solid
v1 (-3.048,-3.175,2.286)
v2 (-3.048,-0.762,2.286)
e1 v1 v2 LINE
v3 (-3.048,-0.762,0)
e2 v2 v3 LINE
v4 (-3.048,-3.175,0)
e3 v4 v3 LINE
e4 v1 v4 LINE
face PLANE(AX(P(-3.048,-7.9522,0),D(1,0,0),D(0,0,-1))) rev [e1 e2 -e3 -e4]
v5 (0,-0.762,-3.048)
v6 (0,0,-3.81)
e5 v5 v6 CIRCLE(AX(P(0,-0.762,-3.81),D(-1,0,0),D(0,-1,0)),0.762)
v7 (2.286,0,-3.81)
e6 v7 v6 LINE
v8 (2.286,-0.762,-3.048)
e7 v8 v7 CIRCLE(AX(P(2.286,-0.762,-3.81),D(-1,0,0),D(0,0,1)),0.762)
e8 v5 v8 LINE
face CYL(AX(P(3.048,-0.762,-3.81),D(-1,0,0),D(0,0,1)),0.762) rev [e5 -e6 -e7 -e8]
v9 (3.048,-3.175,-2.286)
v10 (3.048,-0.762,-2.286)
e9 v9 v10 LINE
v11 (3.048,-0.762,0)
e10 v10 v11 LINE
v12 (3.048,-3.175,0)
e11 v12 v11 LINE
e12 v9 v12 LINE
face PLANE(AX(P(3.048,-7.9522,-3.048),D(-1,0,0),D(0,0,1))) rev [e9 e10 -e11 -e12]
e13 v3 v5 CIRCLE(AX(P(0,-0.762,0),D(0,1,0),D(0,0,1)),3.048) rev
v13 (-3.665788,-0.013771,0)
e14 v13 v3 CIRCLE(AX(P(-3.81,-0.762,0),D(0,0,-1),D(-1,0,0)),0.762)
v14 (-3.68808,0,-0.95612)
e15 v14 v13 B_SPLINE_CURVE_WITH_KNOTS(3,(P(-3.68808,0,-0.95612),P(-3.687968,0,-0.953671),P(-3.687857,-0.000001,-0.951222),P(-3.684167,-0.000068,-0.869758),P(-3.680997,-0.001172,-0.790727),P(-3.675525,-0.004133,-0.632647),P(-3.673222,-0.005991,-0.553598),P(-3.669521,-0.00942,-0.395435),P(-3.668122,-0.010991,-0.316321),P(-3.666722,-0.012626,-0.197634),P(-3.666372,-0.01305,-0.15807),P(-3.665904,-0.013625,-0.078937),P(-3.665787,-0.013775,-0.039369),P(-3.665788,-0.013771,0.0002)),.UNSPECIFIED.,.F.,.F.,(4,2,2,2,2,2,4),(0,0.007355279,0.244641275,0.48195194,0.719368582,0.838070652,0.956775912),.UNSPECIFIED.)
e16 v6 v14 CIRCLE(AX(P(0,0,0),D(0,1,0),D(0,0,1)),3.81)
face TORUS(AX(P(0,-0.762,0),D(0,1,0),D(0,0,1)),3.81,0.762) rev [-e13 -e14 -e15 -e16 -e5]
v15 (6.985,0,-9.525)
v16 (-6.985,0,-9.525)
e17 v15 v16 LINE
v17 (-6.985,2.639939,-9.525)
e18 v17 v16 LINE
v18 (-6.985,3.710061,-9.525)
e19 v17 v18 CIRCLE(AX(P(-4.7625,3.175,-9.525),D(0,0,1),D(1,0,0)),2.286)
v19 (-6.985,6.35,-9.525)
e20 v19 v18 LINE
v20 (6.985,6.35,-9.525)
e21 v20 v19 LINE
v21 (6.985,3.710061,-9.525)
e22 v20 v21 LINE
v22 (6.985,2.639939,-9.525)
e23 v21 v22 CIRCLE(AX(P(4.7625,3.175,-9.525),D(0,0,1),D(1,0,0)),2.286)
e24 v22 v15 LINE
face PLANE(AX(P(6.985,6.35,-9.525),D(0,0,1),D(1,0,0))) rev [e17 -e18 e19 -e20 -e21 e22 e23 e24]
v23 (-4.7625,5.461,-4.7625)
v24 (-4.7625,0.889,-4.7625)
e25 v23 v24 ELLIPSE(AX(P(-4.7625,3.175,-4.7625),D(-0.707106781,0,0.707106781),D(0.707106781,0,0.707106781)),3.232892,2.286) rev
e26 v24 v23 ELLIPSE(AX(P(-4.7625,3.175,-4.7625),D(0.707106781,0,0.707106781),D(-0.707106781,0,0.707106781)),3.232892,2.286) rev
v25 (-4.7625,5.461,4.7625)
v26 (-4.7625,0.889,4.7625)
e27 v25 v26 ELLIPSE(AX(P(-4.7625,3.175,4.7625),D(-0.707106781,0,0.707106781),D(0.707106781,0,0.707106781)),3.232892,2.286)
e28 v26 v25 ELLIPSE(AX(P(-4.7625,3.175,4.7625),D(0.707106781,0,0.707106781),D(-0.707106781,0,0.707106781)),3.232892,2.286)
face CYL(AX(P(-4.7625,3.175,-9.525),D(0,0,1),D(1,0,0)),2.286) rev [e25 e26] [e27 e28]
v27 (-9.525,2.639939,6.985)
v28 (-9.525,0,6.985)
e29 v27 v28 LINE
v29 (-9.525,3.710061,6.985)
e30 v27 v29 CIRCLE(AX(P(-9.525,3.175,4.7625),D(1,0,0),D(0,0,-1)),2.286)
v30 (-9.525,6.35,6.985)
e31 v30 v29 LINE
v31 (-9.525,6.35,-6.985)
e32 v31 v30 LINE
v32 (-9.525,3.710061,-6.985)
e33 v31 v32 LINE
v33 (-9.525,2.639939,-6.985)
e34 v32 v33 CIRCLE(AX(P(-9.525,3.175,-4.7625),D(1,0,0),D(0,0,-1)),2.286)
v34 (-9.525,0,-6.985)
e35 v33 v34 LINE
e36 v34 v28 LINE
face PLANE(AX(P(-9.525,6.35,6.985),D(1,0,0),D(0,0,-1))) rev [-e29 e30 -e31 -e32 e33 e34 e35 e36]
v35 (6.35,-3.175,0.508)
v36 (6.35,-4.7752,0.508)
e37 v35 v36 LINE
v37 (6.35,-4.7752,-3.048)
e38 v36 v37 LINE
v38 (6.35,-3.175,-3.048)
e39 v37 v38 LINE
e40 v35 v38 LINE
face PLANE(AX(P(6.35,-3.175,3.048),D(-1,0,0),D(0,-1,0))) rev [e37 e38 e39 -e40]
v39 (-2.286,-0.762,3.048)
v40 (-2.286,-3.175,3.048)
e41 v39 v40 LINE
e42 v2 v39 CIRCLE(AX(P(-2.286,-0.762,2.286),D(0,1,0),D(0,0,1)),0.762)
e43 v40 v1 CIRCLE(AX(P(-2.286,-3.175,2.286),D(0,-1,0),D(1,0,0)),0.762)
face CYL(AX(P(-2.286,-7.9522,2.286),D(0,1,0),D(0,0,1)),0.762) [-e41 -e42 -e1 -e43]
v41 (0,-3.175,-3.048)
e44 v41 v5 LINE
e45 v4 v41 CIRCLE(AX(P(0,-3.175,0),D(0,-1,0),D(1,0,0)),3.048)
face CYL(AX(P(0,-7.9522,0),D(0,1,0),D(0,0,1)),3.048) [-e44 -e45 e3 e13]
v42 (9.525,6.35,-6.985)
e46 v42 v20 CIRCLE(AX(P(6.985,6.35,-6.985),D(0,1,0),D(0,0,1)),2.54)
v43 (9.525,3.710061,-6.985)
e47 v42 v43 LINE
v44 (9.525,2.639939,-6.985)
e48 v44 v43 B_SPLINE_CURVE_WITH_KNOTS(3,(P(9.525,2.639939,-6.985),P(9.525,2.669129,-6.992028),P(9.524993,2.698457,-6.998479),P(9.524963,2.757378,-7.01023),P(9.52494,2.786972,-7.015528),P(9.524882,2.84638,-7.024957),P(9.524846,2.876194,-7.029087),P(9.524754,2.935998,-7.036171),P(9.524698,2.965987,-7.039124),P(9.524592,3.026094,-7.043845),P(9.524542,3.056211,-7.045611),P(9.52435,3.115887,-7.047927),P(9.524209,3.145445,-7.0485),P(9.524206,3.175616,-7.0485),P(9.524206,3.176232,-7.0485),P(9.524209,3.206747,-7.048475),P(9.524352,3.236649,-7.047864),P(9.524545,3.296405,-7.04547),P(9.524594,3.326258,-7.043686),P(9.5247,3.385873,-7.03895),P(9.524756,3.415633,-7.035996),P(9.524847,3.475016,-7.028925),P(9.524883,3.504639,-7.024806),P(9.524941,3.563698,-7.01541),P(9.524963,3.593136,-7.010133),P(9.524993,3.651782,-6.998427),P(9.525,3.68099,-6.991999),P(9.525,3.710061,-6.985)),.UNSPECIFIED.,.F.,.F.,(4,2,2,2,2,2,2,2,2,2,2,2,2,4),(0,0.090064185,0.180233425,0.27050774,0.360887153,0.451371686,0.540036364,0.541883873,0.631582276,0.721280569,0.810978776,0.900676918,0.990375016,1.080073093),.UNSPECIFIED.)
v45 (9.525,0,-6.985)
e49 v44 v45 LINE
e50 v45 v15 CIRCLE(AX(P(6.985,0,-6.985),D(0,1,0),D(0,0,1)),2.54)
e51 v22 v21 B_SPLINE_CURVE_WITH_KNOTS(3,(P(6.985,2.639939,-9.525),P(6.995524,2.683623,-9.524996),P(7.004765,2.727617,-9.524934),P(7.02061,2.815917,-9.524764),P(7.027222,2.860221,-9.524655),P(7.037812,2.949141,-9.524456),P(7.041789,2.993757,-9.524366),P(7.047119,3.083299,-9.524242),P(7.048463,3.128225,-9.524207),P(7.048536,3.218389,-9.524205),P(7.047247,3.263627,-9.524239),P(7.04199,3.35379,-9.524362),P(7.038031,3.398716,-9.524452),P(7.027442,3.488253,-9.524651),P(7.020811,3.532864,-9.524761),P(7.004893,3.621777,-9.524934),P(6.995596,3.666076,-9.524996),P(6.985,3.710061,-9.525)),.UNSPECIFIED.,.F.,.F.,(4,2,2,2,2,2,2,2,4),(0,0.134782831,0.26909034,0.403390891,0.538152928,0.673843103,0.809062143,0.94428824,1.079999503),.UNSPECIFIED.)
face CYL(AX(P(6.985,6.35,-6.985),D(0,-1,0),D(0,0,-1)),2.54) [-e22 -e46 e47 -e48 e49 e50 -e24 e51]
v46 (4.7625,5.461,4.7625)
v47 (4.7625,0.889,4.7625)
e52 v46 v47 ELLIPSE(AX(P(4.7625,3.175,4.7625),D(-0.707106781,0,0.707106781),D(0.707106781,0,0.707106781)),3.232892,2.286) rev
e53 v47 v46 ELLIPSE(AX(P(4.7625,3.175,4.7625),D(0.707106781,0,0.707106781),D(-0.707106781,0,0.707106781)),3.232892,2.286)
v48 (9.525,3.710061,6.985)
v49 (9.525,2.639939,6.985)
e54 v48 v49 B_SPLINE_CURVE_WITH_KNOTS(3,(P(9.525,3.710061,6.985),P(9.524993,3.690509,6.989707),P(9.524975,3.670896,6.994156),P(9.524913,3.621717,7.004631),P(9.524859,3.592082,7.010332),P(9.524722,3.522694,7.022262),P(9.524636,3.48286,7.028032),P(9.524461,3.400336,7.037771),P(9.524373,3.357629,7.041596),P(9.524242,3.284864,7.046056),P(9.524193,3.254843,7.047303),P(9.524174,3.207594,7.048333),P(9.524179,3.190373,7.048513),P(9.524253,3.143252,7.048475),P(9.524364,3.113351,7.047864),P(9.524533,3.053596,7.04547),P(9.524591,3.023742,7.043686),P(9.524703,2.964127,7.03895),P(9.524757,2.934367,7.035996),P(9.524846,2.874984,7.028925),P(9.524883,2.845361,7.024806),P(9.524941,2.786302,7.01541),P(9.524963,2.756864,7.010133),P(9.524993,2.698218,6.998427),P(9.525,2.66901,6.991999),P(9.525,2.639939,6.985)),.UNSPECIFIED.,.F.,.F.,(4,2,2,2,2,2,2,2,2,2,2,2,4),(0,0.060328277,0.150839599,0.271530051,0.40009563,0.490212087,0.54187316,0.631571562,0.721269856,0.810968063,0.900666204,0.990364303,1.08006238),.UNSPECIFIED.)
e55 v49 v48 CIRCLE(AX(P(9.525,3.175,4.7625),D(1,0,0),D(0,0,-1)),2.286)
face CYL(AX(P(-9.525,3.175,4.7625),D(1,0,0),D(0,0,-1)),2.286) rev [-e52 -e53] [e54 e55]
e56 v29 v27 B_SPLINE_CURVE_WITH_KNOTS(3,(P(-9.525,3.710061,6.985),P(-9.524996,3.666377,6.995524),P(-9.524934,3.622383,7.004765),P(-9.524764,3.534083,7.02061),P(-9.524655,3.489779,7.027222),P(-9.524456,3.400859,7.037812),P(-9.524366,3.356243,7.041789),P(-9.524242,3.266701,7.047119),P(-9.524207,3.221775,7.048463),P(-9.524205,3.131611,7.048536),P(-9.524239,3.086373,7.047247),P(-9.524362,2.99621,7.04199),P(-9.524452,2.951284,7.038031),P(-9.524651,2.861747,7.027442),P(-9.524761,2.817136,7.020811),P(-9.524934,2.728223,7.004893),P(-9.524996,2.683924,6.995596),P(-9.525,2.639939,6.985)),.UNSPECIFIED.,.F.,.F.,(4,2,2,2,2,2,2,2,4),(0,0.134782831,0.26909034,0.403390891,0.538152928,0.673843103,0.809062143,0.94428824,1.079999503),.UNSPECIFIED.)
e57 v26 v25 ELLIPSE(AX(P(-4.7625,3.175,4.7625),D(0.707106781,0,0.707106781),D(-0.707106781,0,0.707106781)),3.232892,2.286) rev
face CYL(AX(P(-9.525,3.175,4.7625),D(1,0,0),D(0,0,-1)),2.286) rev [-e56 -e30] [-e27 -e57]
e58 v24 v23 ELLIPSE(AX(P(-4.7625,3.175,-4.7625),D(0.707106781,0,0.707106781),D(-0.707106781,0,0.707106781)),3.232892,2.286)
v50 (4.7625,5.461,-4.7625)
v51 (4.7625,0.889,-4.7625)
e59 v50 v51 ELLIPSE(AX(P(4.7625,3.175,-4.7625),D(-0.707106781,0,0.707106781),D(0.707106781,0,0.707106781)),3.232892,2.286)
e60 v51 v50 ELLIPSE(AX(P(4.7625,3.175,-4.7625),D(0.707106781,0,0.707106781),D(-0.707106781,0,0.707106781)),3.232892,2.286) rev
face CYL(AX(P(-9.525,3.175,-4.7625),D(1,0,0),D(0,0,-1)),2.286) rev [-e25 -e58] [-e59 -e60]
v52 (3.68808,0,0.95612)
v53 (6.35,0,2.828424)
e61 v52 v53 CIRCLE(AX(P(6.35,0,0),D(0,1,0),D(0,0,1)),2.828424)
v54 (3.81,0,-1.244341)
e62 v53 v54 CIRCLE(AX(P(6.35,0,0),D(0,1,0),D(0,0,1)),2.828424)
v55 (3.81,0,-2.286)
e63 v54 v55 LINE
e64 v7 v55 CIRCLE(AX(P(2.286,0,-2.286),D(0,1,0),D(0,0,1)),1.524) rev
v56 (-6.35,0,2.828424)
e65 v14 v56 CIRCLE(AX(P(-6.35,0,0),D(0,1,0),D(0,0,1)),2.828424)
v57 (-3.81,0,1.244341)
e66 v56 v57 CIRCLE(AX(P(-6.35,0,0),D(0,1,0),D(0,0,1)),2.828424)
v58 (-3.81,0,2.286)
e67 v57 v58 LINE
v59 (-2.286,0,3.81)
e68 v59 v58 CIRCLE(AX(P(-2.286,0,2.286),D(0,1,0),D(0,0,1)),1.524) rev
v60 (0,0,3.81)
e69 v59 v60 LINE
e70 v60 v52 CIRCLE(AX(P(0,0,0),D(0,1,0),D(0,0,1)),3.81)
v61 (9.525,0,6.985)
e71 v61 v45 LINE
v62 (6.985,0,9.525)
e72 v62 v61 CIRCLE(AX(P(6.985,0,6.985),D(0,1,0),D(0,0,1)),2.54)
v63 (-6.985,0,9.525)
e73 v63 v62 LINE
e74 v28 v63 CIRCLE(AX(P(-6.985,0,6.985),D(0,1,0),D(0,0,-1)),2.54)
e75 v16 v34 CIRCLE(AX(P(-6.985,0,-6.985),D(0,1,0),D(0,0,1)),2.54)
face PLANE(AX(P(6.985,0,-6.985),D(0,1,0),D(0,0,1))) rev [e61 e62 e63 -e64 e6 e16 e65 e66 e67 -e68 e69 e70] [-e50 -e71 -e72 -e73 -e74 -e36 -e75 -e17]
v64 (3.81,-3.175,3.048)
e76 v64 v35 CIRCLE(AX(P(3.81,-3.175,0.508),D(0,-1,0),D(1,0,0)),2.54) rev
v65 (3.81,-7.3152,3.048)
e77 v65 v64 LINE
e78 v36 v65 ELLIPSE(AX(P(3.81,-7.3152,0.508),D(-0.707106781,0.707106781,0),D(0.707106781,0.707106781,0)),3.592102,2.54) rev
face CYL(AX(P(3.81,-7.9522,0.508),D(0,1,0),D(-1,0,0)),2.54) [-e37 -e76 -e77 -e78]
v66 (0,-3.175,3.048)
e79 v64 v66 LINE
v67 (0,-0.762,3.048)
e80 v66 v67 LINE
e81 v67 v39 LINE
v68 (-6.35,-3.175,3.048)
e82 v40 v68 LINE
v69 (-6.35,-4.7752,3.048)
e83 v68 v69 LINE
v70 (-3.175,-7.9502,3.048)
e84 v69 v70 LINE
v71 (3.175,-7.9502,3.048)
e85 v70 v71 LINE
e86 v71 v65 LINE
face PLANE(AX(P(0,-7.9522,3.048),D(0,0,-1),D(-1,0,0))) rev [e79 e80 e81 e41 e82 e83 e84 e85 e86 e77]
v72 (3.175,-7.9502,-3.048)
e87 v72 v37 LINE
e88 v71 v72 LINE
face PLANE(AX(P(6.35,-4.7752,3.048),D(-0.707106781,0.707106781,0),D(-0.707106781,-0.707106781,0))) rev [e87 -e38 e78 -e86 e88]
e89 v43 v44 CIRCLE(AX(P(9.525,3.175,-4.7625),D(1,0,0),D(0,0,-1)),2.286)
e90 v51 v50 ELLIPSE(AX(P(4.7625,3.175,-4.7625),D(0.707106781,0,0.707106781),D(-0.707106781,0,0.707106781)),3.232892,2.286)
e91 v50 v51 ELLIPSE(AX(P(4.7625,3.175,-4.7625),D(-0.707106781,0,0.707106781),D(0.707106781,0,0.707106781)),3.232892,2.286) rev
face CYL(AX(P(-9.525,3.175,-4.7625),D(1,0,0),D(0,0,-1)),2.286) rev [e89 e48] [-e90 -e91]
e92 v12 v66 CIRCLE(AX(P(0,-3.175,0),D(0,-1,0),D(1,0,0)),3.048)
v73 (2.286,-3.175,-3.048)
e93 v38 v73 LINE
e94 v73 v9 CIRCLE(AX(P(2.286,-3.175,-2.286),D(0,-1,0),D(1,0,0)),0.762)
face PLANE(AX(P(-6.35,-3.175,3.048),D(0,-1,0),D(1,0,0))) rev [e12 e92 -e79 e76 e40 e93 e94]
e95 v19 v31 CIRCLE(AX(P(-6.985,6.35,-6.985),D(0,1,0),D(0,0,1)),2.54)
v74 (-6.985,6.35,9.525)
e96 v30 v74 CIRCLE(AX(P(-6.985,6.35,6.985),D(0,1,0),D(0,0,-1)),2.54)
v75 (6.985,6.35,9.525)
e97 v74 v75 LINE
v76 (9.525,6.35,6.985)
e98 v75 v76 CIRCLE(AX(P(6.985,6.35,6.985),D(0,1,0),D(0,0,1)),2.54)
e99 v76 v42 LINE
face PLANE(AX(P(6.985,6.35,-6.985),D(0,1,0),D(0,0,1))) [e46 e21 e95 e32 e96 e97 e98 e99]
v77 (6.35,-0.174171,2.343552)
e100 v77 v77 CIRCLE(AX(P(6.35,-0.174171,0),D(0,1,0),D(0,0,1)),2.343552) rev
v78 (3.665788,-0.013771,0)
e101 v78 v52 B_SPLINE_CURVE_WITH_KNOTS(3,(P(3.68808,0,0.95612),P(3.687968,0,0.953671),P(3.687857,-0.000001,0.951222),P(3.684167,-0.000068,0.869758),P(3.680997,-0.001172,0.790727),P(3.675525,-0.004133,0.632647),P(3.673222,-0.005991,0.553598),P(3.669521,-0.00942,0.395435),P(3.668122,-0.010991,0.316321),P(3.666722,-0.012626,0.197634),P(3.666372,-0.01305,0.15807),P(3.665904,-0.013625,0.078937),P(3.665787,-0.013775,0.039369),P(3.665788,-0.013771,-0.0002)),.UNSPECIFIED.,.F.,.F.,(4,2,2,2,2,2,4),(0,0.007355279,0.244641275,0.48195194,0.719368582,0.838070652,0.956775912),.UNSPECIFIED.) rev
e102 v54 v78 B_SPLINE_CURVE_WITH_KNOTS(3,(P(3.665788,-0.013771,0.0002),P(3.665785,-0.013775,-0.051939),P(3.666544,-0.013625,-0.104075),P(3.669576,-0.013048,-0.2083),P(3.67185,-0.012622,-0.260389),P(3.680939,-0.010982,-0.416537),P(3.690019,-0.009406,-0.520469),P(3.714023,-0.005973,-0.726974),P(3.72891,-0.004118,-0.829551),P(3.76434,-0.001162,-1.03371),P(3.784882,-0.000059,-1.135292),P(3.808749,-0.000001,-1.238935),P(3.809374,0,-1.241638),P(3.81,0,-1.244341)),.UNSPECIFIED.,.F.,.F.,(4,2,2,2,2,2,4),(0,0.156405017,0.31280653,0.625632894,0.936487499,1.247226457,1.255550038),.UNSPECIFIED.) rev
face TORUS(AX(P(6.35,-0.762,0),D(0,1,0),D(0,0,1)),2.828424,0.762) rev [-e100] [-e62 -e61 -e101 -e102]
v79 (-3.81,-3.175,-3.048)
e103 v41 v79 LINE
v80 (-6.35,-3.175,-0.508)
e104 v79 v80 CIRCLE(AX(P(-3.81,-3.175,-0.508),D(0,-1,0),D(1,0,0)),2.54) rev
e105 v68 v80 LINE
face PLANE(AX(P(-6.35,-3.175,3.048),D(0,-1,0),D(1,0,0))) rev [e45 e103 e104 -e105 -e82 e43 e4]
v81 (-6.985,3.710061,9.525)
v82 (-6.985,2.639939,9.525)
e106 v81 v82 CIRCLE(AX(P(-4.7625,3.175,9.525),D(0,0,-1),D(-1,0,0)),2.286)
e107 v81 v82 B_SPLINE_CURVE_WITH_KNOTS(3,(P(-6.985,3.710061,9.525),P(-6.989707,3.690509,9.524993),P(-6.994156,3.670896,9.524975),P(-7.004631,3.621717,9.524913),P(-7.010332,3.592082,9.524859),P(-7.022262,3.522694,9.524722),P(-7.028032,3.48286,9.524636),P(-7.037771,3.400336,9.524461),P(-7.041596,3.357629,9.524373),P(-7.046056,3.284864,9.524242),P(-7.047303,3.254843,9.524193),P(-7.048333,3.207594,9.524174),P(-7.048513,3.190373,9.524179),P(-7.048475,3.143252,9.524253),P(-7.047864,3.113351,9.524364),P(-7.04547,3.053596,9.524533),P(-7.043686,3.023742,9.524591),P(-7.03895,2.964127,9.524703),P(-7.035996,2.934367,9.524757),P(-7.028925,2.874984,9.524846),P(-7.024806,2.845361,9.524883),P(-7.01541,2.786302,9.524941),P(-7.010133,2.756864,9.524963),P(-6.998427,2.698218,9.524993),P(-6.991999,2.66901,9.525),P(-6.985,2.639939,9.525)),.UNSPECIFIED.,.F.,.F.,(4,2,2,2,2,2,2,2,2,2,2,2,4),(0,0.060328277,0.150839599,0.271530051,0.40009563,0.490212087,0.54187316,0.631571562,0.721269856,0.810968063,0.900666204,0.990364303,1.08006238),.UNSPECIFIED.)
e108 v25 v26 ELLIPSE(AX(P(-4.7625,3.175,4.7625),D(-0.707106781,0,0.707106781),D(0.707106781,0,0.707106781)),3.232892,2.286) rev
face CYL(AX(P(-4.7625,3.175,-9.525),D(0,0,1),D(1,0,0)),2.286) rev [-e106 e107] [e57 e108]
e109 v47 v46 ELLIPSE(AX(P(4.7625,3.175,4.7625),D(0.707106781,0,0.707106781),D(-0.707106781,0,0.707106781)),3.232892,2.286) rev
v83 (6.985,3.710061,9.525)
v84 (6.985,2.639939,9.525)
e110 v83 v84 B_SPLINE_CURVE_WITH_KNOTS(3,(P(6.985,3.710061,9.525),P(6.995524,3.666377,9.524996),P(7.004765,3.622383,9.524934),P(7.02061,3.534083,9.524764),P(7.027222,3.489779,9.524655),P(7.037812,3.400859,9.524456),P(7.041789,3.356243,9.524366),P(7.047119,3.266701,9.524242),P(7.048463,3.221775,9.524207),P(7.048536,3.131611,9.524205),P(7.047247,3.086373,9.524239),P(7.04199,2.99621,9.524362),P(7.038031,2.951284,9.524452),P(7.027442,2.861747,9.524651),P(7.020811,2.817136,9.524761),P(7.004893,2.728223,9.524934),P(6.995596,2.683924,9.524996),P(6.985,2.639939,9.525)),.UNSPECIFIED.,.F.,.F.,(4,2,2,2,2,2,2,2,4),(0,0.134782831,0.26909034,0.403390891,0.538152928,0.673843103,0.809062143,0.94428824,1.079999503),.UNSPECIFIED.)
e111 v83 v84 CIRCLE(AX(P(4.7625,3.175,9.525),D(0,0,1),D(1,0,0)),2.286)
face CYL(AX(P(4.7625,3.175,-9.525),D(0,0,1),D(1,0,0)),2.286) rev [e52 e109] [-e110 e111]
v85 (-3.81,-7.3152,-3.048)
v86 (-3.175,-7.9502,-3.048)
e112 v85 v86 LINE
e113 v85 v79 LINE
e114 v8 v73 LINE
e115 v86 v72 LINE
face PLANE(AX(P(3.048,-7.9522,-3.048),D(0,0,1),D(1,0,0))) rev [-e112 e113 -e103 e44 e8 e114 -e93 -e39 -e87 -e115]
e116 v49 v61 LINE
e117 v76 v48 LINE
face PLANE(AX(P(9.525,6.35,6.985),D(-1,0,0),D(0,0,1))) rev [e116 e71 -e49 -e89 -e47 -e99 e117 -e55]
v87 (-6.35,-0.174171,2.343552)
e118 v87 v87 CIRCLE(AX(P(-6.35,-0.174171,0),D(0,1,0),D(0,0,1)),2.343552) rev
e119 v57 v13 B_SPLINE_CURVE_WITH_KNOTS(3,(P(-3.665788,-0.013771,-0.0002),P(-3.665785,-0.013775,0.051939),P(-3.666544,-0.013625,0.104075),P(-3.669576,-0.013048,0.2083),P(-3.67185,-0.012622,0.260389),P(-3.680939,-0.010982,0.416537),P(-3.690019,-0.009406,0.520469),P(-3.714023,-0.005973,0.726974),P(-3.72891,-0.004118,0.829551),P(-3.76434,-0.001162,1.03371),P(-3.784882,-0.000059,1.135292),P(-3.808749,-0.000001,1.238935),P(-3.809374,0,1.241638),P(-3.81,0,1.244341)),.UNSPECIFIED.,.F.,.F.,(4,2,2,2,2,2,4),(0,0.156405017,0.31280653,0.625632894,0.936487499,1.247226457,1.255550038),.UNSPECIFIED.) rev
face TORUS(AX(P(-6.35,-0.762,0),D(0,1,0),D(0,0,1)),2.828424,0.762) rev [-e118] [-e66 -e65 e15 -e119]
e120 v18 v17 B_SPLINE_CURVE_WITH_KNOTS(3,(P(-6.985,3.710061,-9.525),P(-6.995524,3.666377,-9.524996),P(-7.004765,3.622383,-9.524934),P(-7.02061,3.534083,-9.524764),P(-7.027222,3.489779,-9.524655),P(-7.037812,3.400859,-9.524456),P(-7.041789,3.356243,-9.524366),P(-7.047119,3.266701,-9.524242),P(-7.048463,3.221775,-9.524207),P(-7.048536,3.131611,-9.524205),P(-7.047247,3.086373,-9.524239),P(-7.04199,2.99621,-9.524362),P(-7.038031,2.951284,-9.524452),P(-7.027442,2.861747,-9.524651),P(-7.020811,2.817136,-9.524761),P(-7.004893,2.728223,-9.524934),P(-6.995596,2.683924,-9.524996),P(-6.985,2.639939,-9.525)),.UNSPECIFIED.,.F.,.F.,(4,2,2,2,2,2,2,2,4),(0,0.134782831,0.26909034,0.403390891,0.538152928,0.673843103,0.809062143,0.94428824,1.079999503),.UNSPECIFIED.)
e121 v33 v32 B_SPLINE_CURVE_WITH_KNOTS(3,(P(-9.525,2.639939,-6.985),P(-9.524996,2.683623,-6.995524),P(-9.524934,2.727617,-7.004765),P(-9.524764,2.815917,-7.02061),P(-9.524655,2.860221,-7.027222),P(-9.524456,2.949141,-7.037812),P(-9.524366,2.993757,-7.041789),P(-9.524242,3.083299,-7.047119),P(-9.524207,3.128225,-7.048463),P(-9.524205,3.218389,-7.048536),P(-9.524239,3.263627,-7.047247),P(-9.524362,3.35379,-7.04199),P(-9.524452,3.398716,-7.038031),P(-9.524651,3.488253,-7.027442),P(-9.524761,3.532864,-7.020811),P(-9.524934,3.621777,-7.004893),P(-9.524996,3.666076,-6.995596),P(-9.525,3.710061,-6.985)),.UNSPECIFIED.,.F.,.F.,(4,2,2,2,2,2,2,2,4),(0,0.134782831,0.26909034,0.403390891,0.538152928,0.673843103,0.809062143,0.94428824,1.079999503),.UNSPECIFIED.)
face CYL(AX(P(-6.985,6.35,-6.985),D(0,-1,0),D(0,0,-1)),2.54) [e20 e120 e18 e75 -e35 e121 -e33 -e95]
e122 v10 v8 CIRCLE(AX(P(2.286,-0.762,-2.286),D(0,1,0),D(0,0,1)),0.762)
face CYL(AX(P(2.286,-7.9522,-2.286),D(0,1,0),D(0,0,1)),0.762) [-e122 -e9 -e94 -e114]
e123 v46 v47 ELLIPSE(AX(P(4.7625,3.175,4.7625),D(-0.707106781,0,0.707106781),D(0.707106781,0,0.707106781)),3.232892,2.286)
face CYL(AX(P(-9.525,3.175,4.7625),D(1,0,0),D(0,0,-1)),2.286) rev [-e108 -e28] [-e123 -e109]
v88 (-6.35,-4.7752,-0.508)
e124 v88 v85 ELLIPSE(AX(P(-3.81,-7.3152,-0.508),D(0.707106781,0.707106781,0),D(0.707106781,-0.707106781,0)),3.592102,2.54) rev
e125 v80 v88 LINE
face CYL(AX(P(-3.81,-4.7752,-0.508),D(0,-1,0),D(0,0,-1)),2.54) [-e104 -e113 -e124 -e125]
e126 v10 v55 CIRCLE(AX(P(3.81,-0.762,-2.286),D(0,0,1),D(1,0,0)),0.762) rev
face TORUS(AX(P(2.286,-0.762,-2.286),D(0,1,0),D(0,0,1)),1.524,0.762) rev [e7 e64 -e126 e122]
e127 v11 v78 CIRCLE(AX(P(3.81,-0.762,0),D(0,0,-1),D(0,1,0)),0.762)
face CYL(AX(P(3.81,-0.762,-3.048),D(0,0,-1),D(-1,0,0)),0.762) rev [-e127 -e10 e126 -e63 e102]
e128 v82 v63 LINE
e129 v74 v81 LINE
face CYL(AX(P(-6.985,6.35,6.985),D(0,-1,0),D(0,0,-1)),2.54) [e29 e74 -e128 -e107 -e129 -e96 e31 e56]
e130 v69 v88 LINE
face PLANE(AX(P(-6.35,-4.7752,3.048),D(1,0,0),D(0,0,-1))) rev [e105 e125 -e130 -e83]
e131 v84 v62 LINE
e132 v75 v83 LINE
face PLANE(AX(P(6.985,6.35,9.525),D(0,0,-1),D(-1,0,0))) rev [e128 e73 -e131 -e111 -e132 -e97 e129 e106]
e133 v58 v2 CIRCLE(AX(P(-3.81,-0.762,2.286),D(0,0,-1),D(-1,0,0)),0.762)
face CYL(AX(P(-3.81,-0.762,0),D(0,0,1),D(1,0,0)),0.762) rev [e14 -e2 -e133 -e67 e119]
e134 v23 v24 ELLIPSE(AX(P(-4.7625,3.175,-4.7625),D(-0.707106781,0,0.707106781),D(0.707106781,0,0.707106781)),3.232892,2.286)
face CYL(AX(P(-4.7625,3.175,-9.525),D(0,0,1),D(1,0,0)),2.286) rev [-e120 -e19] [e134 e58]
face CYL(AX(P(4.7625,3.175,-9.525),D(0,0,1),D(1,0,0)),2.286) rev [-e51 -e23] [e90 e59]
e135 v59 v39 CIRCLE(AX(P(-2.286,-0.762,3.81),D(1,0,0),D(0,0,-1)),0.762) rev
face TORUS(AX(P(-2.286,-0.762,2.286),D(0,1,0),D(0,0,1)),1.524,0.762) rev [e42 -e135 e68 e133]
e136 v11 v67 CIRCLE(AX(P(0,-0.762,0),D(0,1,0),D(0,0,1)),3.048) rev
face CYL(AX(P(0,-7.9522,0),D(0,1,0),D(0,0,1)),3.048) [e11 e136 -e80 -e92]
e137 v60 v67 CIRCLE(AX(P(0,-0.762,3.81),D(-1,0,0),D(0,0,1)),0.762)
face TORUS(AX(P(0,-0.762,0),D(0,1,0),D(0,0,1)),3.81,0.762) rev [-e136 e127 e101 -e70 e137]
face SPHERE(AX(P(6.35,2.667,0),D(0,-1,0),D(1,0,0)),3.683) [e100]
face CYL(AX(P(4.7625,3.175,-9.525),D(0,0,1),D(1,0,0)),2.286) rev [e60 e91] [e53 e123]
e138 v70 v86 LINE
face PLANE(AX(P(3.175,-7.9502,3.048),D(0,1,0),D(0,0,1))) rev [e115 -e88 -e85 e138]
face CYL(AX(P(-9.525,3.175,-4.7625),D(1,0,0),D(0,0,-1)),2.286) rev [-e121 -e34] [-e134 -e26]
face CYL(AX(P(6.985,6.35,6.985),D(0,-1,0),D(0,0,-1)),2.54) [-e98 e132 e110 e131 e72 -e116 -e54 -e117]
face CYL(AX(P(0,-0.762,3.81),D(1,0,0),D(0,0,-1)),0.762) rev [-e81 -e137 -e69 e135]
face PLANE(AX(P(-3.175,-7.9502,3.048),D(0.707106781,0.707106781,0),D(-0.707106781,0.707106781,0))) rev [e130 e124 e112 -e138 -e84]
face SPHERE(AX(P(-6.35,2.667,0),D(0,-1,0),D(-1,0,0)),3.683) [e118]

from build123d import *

# Parameters (mm, degrees)
BOSS_EXTRUDE1_DEPTH     = 6.35
CUT_EXTRUDE1_START      = -9.525
SKETCH2_R               = 2.286
SKETCH2_R_2             = 2.285999999999999
CUT_EXTRUDE1_DEPTH      = 19.05
CUT_EXTRUDE2_DEPTH      = 15.892070207999966
CUT_EXTRUDE2_DEPTH_BACK = 15.892070207999966
SKETCH3_R               = 2.286
BOSS_EXTRUDE2_DEPTH     = 3.048
BOSS_EXTRUDE3_REACH     = 17.642
FILLET1_R               = 2.54
FILLET2_R               = 0.762


with BuildPart() as part:
    # Sketch1 → Boss-Extrude1 (new body)
    with BuildSketch(Plane(origin=(0, 0, 0), x_dir=(1, 0, 0), z_dir=(0, 1, 0))):
        with BuildLine():
            Line((6.984999999999984, -9.525000000000002), (-6.98499999999998, -9.525000000000006))
            ThreePointArc((-6.98499999999998, -9.525000000000006), (-8.78105122421383, -8.781051224213837), (-9.524999999999999, -6.984999999999987))
            Line((-9.524999999999999, -6.984999999999987), (-9.524999999999999, 6.984999999999979))
            ThreePointArc((-9.524999999999999, 6.984999999999979), (-8.78105122421383, 8.781051224213828), (-6.984999999999981, 9.524999999999997))
            Line((-6.984999999999981, 9.524999999999997), (6.984999999999984, 9.525))
            ThreePointArc((6.984999999999984, 9.525), (8.781051224213833, 8.781051224213831), (9.525000000000002, 6.984999999999983))
            Line((9.525000000000002, 6.984999999999983), (9.525000000000002, -6.984999999999984))
            ThreePointArc((9.525000000000002, -6.984999999999984), (8.781051224213833, -8.781051224213833), (6.984999999999984, -9.525000000000002))
        make_face()
    extrude(amount=BOSS_EXTRUDE1_DEPTH)

    # Sketch2 → Cut-Extrude1 (cut)
    with BuildSketch(Plane.XY.offset(CUT_EXTRUDE1_START)):
        with Locations(Location((-4.7624999999999975, 3.175, 0), (0, 0, 166.463797263))):
            Circle(SKETCH2_R)
        with Locations(Location((4.762500000000003, 3.175, 0), (0, 0, 13.536202737))):
            Circle(SKETCH2_R_2)
    extrude(amount=CUT_EXTRUDE1_DEPTH, mode=Mode.SUBTRACT)

    # Sketch3 → Cut-Extrude2 (cut, two sides: drawn at the far end of the back side and taken through both)
    with BuildSketch(Plane(origin=(0, 0, 0), x_dir=(0, 0, -1), z_dir=(1, 0, 0)).offset(-CUT_EXTRUDE2_DEPTH_BACK)):
        with Locations(Location((-4.7625, 3.175, 0), (0, 0, 90))):
            Circle(SKETCH3_R)
        with Locations(Location((4.7625, 3.175, 0), (0, 0, 90))):
            Circle(SKETCH3_R)
    extrude(amount=CUT_EXTRUDE2_DEPTH + CUT_EXTRUDE2_DEPTH_BACK, mode=Mode.SUBTRACT)


with BuildPart() as body_2:
    # Sketch4 → Boss-Extrude2 (new, symmetric)
    with BuildSketch(Plane.XY):
        Polygon((-6.35, -3.175), (6.35, -3.1749999999999985), (6.350000000000001, -4.775199999999996), (3.175, -7.950199999999998), (-3.174999999999998, -7.950199999999998), (-6.35, -4.775199999999998), align=None)
    extrude(amount=BOSS_EXTRUDE2_DEPTH, both=True)

    # Sketch5 → Boss-Extrude3 (add, up to next)
    with BuildSketch(Plane.XZ, mode=Mode.PRIVATE) as boss_extrude3_sk1:
        with BuildLine():
            Line((3.0479999999999996, -3.0479999999999996), (0, -3.048))
            ThreePointArc((0, -3.048), (-2.155261469056597, -2.155261469056597), (-3.0479999999999996, 4.3e-16))
            Line((-3.0479999999999996, 4.3e-16), (-3.048000000000001, 3.048))
            Line((-3.048000000000001, 3.048), (0, 3.048))
            ThreePointArc((0, 3.048), (2.1552614690565965, 2.155261469056597), (3.0479999999999996, 4.3e-16))
            Line((3.0479999999999996, 4.3e-16), (3.0479999999999996, -3.0479999999999996))
        make_face()
    boss_extrude3_tool1 = extrude(boss_extrude3_sk1.sketch, amount=BOSS_EXTRUDE3_REACH, mode=Mode.PRIVATE) - body_2.part

    add(part.part)  # Boss-Extrude3 merges part
    add(boss_extrude3_tool1.solids().sort_by_distance((0, 0, 0))[0])

    # Sketch6 → Revolve1 (revolve)
    with BuildSketch(Plane.XY):
        with BuildLine():
            Line((-6.349999999999999, -1.016), (-6.349999999999999, 0))
            Line((-6.349999999999999, 0), (-8.889999999999999, 0))
            ThreePointArc((-8.889999999999999, 0), (-7.717831861012163, -0.7525796525304105), (-6.349999999999999, -1.016))
        make_face()
    revolve1 = revolve(axis=Axis((-6.349999999999999, 0, 0), (0, 1, 0)))

    # Mirror1: Revolve1 across plane
    add(revolve1.mirror(Plane(origin=(0, 0, 0), x_dir=(0, 0, 1), z_dir=(1, 0, 0))))

    # Fillet1
    fillet1_edges = [body_2.edges().sort_by_distance(p)[0] for p in [
        (-6.35, -3.975099999999999, -3.048),
        (6.3500000000000005, -3.9750999999999976, 3.048),
    ]]
    fillet(fillet1_edges, radius=FILLET1_R)

    # Fillet2
    # the kernel refuses this fillet: 0.762 mm, written as the material it adds along each edge
    with BuildSketch(Plane(origin=(-6.349999999999999, 0, 0), x_dir=(-1, 0, 0), z_dir=(0, 0, -1))) as fillet2_piece_1:
        with BuildLine():
            CenterArc((2.8284242963176522, -0.762), FILLET2_R, 90, 39.51765279717284)
            ThreePointArc((2.3435515598060546, -0.17417142857142887), (2.443328238479981, -0.08883673664575209), (2.54, 0))
            Line((2.54, 0), (2.8284242963176522, 0))
        make_face()
    revolve(axis=Axis((-6.349999999999999, 0, 0), (0, 1, 0)))
    with BuildSketch(Plane(origin=(6.349999999999999, 0, 0), x_dir=(1, 0, 0), z_dir=(0, 0, -1))) as fillet2_piece_2:
        with BuildLine():
            CenterArc((2.8284242963176522, 0.762), FILLET2_R, 230.48234720282716, 39.51765279717284)
            ThreePointArc((2.3435515598060546, 0.17417142857142887), (2.443328238479981, 0.08883673664575209), (2.54, 0))
            Line((2.54, 0), (2.8284242963176522, 0))
        make_face()
    revolve(axis=Axis((6.349999999999999, 0, 0), (0, -1, 0)))
    # the kernel refuses this fillet: 0.762 mm, written as the material it takes off along each edge
    with BuildSketch(Plane(origin=(3.0479999999999996, 0, -3.0479999999999996), x_dir=(0, 0, 1), z_dir=(0, -1, 0))) as fillet2_2_piece_1:
        with BuildLine():
            CenterArc((FILLET2_R, FILLET2_R), FILLET2_R, 180, 90)
            Line((0, FILLET2_R), (0, 0))
            Line((0, 0), (FILLET2_R, 0))
        make_face()
    extrude(amount=3.174999999999999, mode=Mode.SUBTRACT)
    with BuildSketch(Plane(origin=(-3.048000000000001, 0, 3.048), x_dir=(1, 0, 0), z_dir=(0, -1, 0))) as fillet2_2_piece_2:
        with BuildLine():
            CenterArc((FILLET2_R, -FILLET2_R), FILLET2_R, 90, 90)
            Line((4.4e-16, -FILLET2_R), (0, 0))
            Line((0, 0), (FILLET2_R, 0))
        make_face()
    extrude(amount=3.1749999999999994, mode=Mode.SUBTRACT)
    # the kernel refuses this fillet: 0.762 mm, written as the material it adds along each edge
    with BuildSketch(Plane(origin=(-7.8e-16, 0, -1.55e-15), x_dir=(2.5e-16, 0, -1), z_dir=(1, 0, 2.5e-16))) as fillet2_3_piece_1:
        with BuildLine():
            CenterArc((3.0479999999999983 + FILLET2_R, -FILLET2_R), FILLET2_R, 90, 90)
            Line((3.0479999999999983 + FILLET2_R, 1.1e-16), (3.0479999999999983, 0))
            Line((3.0479999999999983, 0), (3.0479999999999983, -FILLET2_R))
        make_face()
    revolve(axis=Axis((-7.8e-16, 0, -1.55e-15), (0, 1, 0)), revolution_arc=90.00000000000006)
    with BuildSketch(Plane(origin=(2.2859999999999996, 0, -3.0479999999999996), x_dir=(0, -1, -5.8e-16), z_dir=(-1, 0, -1.5e-16))) as fillet2_3_piece_2:
        with BuildLine():
            CenterArc((FILLET2_R, -FILLET2_R), FILLET2_R, 90.00000000000004, 89.99999999999996)
            Line((0, -FILLET2_R), (0, 0))
            Line((0, 0), (FILLET2_R, 0))
        make_face()
    extrude(amount=2.2859999999999996)
    with BuildSketch(Plane(origin=(3.0479999999999996, 0, 4.3e-16), x_dir=(0, -1, 0), z_dir=(0, 0, -1))) as fillet2_3_piece_3:
        with BuildLine():
            CenterArc((FILLET2_R, -FILLET2_R), FILLET2_R, 90, 90)
            Line((-1.1e-16, -FILLET2_R), (0, 0))
            Line((0, 0), (FILLET2_R, 0))
        make_face()
    extrude(amount=2.286)
    with BuildSketch(Plane(origin=(-3.0479999999999996, 0, 4.3e-16), x_dir=(0, -1, 0), z_dir=(-4.4e-16, 0, 1))) as fillet2_3_piece_4:
        with BuildLine():
            CenterArc((FILLET2_R, -FILLET2_R), FILLET2_R, 90, 90)
            Line((-1.1e-16, -FILLET2_R), (0, 0))
            Line((0, 0), (FILLET2_R, 0))
        make_face()
    extrude(amount=2.285999999999999)
    with BuildSketch(Plane(origin=(-2.2e-16, 0, 2.2e-16), x_dir=(7e-17, 0, 1), z_dir=(-1, 0, 7e-17))) as fillet2_3_piece_5:
        with BuildLine():
            CenterArc((3.048 + FILLET2_R, -FILLET2_R), FILLET2_R, 90, 90)
            Line((3.048 + FILLET2_R, 1.1e-16), (3.048, 0))
            Line((3.048, 0), (3.048, -FILLET2_R))
        make_face()
    revolve(axis=Axis((-2.2e-16, 0, 2.2e-16), (0, 1, 0)), revolution_arc=90)
    with BuildSketch(Plane(origin=(-2.2860000000000005, 0, 3.048), x_dir=(0, -1, 0), z_dir=(1, 0, 0))) as fillet2_3_piece_6:
        with BuildLine():
            CenterArc((FILLET2_R, -FILLET2_R), FILLET2_R, 90, 90)
            Line((-4.4e-16, -FILLET2_R), (0, 0))
            Line((0, 0), (FILLET2_R, 0))
        make_face()
    extrude(amount=2.2860000000000005)
    with BuildSketch(Plane(origin=(-2.2860000000000005, 0, 2.286), x_dir=(0, 0, 1), z_dir=(1, 0, 0))) as fillet2_3_piece_7:
        with BuildLine():
            CenterArc((0.762 + FILLET2_R, FILLET2_R), FILLET2_R, 180, 90)
            Line((0.762, FILLET2_R), (0.762, 0))
            Line((0.762, 0), (0.762 + FILLET2_R, 0))
        make_face()
    revolve(axis=Axis((-2.2860000000000005, 0, 2.286), (0, -1, 0)), revolution_arc=90.00000000000004)
    with BuildSketch(Plane(origin=(2.2859999999999996, 0, -2.2859999999999996), x_dir=(1, 0, 0), z_dir=(0, 0, 1))) as fillet2_3_piece_8:
        with BuildLine():
            CenterArc((0.762 + FILLET2_R, -FILLET2_R), FILLET2_R, 90, 90)
            Line((0.762 + FILLET2_R, 1.1e-16), (0.762, 0))
            Line((0.762, 0), (0.762, -FILLET2_R))
        make_face()
    revolve(axis=Axis((2.2859999999999996, 0, -2.2859999999999996), (0, 1, 0)), revolution_arc=90)


solid = body_2.part
